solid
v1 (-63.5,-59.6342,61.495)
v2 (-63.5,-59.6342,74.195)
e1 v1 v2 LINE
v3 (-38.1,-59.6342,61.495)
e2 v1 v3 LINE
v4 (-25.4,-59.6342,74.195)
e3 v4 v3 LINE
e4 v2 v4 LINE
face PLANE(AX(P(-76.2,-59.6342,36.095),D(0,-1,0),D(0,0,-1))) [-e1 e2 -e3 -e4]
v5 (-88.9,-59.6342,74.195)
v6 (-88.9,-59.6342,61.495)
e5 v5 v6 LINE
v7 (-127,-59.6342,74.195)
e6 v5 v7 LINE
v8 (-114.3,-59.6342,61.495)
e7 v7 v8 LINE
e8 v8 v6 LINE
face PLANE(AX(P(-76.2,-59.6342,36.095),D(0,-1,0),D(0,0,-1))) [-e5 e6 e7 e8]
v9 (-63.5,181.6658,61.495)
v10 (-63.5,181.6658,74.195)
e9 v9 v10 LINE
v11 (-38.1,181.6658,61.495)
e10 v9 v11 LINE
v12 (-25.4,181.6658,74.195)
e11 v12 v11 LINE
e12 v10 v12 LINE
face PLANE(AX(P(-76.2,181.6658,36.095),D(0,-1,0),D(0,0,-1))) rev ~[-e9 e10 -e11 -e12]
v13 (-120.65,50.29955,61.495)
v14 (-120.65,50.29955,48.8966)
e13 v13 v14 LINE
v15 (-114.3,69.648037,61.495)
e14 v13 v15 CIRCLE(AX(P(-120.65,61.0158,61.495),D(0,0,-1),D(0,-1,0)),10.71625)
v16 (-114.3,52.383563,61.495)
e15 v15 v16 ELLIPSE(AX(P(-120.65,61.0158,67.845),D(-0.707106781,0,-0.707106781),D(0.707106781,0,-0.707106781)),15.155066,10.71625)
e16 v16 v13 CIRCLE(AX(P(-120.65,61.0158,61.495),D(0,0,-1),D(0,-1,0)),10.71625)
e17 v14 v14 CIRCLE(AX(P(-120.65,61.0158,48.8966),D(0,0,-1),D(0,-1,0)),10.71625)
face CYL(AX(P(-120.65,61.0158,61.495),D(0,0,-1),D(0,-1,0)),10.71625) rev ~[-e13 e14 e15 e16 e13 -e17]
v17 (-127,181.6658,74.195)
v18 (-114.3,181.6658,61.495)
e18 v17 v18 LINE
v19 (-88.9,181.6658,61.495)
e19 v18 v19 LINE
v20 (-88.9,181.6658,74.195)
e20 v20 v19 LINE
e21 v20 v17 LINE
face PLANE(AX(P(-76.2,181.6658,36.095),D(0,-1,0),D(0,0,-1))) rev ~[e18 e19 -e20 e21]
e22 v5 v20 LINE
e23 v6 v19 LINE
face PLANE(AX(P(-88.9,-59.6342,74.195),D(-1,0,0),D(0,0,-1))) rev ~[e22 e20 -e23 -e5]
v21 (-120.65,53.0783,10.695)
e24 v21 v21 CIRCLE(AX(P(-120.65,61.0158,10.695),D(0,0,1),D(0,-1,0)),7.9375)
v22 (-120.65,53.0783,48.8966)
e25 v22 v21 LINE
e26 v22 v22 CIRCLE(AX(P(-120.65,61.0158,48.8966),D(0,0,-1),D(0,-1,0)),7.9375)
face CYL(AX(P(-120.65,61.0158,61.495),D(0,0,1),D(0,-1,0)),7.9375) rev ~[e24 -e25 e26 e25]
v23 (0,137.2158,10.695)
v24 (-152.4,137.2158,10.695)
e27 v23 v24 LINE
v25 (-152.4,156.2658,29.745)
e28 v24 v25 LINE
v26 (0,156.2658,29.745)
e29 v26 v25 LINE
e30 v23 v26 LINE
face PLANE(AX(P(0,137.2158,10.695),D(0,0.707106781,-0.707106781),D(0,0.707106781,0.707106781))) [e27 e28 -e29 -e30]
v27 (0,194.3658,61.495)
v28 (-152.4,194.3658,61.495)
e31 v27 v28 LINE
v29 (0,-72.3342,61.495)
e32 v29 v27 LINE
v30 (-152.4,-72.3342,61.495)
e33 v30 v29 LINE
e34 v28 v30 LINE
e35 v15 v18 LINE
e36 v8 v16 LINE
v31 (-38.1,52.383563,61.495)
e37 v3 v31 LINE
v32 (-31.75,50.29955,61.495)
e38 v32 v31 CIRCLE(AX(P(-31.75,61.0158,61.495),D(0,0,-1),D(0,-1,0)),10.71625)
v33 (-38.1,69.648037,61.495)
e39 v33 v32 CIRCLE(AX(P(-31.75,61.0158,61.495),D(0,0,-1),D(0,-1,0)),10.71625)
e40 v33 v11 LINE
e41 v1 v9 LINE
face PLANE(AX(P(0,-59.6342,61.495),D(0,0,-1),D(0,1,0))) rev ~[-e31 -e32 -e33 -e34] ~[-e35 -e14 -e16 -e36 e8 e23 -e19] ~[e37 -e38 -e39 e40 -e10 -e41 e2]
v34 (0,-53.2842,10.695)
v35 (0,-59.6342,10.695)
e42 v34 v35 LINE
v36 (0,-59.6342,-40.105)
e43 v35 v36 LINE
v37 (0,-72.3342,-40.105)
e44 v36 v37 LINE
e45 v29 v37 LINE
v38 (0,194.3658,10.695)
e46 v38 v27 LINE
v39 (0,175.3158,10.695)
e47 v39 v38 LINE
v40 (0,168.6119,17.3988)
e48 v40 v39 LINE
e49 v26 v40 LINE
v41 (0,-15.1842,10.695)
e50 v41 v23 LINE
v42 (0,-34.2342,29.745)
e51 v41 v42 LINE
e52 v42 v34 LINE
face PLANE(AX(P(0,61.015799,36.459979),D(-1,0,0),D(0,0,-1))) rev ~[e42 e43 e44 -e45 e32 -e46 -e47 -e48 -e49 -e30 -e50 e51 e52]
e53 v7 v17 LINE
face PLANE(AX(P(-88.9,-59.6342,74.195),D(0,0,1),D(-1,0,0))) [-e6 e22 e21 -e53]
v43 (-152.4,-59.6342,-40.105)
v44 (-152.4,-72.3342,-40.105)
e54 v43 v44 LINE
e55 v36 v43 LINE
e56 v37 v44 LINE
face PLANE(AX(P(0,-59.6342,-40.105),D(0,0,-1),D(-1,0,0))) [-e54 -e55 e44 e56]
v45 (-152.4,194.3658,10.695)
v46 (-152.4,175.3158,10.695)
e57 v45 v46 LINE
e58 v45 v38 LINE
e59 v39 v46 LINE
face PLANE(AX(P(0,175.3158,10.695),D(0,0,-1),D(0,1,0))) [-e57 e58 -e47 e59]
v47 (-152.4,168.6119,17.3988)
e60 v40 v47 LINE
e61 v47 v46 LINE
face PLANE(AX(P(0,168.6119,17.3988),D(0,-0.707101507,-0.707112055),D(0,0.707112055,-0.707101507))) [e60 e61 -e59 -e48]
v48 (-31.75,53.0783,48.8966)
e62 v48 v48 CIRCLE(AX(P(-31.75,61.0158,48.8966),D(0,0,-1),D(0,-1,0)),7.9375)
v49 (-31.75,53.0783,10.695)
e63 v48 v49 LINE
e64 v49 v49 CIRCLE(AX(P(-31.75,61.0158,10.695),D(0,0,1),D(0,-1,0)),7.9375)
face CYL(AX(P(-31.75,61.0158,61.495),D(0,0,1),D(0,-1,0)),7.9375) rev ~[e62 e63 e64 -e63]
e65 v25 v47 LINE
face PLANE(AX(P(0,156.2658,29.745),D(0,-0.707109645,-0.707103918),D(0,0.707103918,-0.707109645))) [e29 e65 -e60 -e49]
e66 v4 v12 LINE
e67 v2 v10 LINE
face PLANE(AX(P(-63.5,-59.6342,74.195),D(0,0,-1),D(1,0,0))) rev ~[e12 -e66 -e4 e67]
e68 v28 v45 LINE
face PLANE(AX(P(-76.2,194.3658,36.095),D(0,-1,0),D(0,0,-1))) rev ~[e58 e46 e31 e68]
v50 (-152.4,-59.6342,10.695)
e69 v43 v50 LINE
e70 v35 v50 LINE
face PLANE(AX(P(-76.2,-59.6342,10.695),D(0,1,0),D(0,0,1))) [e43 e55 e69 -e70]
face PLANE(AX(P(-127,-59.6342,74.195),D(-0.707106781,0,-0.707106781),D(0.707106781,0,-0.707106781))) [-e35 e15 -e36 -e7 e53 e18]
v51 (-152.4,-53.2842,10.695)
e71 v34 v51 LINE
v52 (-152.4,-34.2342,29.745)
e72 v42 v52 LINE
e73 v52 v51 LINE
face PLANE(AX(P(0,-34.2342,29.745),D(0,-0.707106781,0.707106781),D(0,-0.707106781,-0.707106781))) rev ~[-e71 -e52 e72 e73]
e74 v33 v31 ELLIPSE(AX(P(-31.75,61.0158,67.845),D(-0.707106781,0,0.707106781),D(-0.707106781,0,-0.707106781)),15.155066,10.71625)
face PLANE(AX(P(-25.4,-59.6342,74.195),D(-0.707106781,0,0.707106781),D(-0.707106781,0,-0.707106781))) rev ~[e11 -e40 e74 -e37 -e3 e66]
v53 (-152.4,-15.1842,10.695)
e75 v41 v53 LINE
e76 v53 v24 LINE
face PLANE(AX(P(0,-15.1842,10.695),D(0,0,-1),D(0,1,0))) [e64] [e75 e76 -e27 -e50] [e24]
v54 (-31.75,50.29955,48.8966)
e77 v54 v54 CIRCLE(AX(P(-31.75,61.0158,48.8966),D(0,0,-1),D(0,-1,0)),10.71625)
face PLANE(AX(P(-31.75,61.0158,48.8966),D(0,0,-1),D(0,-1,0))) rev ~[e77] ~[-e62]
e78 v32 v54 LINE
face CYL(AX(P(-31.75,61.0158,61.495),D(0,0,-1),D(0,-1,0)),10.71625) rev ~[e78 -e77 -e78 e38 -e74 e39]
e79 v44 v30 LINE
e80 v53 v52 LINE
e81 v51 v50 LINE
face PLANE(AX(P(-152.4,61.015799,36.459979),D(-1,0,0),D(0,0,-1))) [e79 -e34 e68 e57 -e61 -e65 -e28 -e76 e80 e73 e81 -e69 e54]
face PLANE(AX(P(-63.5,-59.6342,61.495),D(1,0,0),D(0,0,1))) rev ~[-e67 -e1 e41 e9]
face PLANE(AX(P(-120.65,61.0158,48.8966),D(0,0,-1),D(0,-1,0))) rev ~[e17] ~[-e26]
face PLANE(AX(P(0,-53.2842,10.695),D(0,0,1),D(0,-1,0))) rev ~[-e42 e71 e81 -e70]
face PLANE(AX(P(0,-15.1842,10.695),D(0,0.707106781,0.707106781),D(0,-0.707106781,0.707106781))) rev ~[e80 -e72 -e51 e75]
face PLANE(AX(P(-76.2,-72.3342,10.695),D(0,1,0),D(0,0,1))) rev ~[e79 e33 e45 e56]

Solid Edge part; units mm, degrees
sketch "Sketch1" plane through (0, 0, 0) normal (1, 0, 0) x (0, 1, 0)
  line L0 (-59.6342, 10.695) -> (-59.6342, 48.795)
  line L1 (-59.6342, 48.795) -> (-59.6342, 61.495)
  line L2 (-59.6342, 61.495) -> (181.6658, 61.495)
  line L3 (181.6658, 61.495) -> (181.6658, 48.795)
  line L4 (181.6658, 10.695) -> (181.6658, 48.795)
  line L5 (175.3158, 10.695) -> (181.6658, 10.695)
  line L6 (168.6119, 17.3988) -> (175.3158, 10.695)
  line L7 (156.2658, 29.745) -> (168.6119, 17.3988)
  line L8 (137.2158, 10.695) -> (156.2658, 29.745)
  line L9 (-15.1842, 10.695) -> (137.2158, 10.695)
  line L10 (-15.1842, 10.695) -> (-34.2342, 29.745)
  line L11 (-34.2342, 29.745) -> (-53.2842, 10.695)
  line L12 (-53.2842, 10.695) -> (-59.6342, 10.695)
extrude "Protrusion1" add sketch "Sketch1" against normal blind 152.4
sketch "Sketch2" plane through (-76.2, -59.6342, 36.095) normal (0, -1, 0) x (1, 0, 0)
  line L0 (76.2, -76.2) -> (-76.2, -76.2)
  line L1 (-76.2, -76.2) -> (-76.2, 25.4)
  line L2 (-76.2, 25.4) -> (76.2, 25.4)
  line L3 (76.2, 25.4) -> (76.2, -76.2)
extrude "ExtrudedProtrusion_2" add sketch "Sketch2" along normal blind 12.7
sketch "Sketch3" plane through (-76.2, 181.6658, 36.095) normal (0, 1, 0) x (-1, 0, 0)
  line L0 (-76.2, 25.4) -> (76.2, 25.4)
  line L1 (76.2, 25.4) -> (76.2, -25.4)
  line L2 (76.2, -25.4) -> (-76.2, -25.4)
  line L3 (-76.2, -25.4) -> (-76.2, 25.4)
extrude "ExtrudedProtrusion_3" add sketch "Sketch3" along normal blind 12.7
hole "Hole_1" at (-120.65, 61.0158, 61.495) direction (0, 0, -1) diameter 15.875 end up to next counterbore diameter 21.4325 counterbore depth 12.5984
hole "Hole1" at (-31.75, 61.0158, 61.495) direction (0, 0, -1) diameter 15.875 end up to next counterbore diameter 21.4325 counterbore depth 12.5984
sketch "Sketch4" plane through (-76.2, -59.6342, 36.095) normal (0, -1, 0) x (1, 0, 0)
  line L0 (-50.8, 38.1) -> (-38.1, 25.4)
  line L1 (-12.7, 38.1) -> (-50.8, 38.1)
  line L2 (-12.7, 38.1) -> (-12.7, 25.4)
  line L3 (-12.7, 25.4) -> (12.7, 25.4)
  line L4 (12.7, 25.4) -> (12.7, 38.1)
  line L5 (12.7, 38.1) -> (50.8, 38.1)
  line L6 (50.8, 38.1) -> (38.1, 25.4)
extrude "ExtrudedProtrusion_4" add sketch "Sketch4" against normal blind 241.3 material side at (-120.6146, -59.6342, 67.8804)
